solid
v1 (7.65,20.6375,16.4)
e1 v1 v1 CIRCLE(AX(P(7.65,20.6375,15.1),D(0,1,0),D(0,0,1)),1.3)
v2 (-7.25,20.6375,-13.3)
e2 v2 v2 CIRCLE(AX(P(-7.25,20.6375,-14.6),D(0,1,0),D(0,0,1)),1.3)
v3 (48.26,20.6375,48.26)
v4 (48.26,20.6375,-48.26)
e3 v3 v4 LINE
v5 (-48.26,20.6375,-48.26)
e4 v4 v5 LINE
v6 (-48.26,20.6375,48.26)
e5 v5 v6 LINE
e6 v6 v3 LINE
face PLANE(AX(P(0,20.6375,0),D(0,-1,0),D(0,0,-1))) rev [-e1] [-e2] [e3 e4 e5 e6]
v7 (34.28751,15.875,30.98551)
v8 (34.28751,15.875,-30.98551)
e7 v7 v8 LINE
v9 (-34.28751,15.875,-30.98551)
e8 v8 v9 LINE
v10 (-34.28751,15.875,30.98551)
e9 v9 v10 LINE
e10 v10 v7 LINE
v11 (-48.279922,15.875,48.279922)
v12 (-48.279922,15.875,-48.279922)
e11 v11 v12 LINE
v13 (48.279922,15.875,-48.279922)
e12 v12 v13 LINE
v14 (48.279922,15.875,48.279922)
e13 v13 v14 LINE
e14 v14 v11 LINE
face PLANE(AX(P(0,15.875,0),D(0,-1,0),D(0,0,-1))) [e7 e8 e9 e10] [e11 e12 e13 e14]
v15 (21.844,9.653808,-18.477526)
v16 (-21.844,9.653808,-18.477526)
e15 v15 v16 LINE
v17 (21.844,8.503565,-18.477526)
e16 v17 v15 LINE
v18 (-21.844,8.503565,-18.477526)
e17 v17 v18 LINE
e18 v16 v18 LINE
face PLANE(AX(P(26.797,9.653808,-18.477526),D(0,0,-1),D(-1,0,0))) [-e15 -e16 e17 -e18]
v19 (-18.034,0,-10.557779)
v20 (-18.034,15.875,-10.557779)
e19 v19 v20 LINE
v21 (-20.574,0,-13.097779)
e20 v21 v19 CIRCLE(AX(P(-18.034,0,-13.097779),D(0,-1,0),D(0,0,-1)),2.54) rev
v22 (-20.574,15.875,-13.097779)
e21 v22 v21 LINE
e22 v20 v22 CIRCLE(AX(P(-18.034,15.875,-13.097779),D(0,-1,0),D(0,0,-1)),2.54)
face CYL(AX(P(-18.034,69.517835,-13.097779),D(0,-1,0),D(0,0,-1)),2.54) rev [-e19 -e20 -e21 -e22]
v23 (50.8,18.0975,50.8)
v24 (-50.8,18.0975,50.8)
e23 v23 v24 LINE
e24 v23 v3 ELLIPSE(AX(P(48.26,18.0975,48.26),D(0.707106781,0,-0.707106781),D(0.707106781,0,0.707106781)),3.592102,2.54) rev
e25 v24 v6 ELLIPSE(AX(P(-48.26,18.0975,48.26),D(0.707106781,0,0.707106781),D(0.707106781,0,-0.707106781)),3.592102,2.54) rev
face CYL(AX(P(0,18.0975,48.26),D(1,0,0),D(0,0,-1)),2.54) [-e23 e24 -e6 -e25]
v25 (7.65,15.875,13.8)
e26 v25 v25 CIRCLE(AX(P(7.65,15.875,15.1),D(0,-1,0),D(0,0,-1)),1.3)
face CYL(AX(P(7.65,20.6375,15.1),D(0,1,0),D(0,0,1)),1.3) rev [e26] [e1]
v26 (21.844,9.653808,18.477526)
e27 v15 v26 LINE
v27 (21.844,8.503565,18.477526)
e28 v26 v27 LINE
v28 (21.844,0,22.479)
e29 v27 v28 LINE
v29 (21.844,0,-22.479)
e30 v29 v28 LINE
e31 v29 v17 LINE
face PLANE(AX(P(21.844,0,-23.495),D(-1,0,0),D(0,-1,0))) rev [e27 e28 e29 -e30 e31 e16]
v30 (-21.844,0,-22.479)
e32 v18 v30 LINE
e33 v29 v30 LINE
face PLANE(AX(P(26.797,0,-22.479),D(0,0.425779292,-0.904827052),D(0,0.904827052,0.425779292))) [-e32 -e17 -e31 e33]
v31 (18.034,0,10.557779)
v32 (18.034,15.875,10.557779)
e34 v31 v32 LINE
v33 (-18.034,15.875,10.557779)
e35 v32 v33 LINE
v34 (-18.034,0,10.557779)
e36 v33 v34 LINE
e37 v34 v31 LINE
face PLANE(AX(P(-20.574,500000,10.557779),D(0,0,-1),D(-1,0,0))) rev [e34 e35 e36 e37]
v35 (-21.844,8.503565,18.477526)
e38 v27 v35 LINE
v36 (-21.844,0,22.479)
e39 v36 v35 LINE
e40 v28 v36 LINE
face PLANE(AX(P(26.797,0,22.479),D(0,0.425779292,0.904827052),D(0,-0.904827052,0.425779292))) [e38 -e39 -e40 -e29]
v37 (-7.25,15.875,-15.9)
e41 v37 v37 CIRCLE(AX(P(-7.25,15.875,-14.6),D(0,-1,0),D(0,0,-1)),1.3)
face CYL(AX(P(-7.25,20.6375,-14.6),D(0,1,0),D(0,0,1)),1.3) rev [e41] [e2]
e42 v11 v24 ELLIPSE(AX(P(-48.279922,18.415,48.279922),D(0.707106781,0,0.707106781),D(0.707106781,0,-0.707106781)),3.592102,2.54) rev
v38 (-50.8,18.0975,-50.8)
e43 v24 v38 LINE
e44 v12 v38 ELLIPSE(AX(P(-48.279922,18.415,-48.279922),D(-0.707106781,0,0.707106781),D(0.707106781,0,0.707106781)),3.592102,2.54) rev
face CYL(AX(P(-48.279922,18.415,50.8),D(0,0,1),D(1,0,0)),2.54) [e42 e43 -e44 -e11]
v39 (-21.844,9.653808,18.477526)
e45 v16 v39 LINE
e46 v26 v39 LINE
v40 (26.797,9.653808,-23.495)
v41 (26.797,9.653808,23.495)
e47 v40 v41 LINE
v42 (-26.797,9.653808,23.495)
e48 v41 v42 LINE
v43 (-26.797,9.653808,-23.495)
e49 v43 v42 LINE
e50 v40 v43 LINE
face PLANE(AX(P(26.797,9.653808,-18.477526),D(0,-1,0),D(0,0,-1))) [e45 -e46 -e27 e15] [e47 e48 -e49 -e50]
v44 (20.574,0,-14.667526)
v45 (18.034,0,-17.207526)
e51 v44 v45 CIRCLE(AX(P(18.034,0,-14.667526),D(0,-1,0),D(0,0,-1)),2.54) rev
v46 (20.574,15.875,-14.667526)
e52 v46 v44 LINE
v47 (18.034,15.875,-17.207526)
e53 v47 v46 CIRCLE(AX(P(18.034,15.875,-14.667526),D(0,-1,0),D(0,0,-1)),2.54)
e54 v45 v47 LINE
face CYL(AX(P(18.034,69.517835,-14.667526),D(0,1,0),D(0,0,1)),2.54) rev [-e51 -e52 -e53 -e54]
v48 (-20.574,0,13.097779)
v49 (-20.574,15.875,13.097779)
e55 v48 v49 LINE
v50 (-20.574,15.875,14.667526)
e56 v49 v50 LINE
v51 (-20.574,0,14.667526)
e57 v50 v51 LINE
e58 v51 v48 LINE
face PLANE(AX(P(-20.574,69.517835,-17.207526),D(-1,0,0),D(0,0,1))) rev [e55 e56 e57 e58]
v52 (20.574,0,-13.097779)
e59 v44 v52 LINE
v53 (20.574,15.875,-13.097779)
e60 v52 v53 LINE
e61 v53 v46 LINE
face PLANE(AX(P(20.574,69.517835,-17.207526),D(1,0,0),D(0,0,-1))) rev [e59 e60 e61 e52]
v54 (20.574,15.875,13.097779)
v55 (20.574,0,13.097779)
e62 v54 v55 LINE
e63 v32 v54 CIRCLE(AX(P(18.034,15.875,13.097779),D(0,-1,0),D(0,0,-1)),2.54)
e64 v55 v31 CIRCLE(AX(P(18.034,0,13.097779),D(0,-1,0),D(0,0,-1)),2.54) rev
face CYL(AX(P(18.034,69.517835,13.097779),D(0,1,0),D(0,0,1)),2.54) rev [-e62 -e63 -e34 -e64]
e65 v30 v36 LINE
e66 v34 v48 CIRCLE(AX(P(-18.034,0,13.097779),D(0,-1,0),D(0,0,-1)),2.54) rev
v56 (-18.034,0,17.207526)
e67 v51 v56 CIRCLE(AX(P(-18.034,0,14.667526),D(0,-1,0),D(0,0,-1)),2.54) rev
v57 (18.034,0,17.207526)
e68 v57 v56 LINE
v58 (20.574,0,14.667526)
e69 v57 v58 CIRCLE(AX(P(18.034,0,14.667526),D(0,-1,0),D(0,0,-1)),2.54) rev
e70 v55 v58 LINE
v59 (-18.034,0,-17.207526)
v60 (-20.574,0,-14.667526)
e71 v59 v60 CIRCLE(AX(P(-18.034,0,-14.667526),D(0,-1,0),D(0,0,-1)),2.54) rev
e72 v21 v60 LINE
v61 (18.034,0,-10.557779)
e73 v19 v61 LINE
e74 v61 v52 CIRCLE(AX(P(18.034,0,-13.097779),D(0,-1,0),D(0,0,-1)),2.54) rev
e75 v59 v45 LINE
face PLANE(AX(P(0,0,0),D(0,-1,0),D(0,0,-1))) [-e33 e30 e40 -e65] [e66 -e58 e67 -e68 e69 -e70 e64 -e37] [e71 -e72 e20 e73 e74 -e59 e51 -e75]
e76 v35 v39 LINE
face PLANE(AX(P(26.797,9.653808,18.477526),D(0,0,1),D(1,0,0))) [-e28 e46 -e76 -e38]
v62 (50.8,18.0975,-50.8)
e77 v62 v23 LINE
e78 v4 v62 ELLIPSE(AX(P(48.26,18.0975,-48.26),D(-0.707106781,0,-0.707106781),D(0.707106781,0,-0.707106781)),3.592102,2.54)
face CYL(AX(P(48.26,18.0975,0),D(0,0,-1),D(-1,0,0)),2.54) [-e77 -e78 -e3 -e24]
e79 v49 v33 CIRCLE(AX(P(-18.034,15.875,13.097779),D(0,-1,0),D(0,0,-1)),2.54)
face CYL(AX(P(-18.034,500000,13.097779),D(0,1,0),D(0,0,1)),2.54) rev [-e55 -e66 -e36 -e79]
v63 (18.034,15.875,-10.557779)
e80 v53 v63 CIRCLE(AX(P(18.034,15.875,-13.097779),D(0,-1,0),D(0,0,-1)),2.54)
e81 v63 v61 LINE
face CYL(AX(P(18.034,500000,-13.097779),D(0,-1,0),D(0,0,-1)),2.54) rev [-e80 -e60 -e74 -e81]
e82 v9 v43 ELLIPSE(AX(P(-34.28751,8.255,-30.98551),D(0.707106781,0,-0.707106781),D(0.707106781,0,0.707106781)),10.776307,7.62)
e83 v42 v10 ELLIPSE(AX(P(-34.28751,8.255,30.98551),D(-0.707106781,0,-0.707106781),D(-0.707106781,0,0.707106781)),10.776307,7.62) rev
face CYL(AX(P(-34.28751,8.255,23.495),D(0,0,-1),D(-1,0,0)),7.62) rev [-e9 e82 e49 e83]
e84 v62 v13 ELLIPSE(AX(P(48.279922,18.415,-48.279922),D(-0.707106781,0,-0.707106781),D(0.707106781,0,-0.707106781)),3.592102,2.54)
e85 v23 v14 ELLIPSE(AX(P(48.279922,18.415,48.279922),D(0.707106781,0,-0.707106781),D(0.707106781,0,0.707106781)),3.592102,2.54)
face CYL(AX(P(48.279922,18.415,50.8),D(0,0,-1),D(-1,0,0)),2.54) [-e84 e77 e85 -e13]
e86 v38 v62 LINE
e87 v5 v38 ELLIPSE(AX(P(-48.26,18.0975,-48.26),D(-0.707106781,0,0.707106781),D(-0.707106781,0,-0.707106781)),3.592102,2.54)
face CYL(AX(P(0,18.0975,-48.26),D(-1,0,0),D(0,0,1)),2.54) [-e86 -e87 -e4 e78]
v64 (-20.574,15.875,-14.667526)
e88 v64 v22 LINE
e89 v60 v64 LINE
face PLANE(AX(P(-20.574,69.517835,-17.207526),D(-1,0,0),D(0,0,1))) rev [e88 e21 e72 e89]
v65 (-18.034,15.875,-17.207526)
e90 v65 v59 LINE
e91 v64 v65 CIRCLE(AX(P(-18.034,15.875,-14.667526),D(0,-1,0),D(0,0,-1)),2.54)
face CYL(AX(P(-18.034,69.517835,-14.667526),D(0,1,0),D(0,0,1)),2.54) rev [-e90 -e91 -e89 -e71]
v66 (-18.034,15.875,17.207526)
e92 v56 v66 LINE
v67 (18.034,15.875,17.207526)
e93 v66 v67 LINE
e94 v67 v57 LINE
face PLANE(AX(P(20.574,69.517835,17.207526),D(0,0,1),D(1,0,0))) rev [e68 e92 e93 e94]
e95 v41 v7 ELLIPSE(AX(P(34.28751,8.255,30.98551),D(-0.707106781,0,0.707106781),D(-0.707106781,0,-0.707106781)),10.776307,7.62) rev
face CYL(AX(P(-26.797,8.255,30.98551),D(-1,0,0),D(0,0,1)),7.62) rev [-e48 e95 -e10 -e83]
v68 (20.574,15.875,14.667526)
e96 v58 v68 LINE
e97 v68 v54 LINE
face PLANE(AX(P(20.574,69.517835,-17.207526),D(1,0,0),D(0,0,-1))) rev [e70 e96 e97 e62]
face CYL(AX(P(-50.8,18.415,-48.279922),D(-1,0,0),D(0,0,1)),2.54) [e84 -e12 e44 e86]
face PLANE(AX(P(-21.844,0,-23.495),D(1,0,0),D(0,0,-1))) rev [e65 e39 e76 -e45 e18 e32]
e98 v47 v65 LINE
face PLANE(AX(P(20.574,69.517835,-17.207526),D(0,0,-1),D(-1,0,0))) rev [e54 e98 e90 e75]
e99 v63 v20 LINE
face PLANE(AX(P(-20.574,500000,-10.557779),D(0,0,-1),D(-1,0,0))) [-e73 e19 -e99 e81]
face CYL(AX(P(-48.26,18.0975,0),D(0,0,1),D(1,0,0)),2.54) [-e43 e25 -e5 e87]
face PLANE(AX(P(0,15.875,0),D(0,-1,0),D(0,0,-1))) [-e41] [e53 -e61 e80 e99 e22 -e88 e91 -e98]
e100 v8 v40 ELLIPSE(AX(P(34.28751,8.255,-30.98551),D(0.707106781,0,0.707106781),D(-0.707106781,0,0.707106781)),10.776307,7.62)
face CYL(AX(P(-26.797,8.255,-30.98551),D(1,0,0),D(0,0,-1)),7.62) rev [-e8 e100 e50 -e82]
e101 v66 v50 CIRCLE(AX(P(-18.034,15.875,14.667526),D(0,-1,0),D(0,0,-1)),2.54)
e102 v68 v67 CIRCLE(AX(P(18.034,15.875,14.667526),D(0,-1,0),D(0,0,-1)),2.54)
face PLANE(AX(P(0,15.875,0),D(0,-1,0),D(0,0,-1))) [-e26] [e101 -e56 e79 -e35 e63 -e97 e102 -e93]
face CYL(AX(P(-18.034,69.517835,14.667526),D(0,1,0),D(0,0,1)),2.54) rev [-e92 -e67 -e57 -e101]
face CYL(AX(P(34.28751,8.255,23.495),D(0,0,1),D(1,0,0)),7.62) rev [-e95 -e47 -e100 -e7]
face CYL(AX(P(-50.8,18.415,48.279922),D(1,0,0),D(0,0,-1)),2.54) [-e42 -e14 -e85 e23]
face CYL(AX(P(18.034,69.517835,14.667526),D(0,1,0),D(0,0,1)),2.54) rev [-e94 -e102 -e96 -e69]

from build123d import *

# Parameters (mm, degrees)
SKETCH1_W                  = 53.594
SKETCH1_H                  = 46.99
BOSS_EXTRUDE1_DEPTH        = 12.7
CUT_EXTRUDE1_DEPTH         = 62.251008522
SKETCH3_W                  = 4.953
SKETCH3_H                  = 9.653808373
CUT_EXTRUDE2_DEPTH         = 56.564640816
SKETCH4_W                  = 53.594
SKETCH4_H                  = 46.99
BOSS_EXTRUDE2_DEPTH        = 3.175
SKETCH5_W                  = 101.6
SKETCH5_H                  = 101.6
BOSS_EXTRUDE3_DEPTH        = 4.7625
FILLET1_R                  = 7.62
SKETCH6_W                  = 41.148
SKETCH6_H                  = 34.415052436
CUT_EXTRUDE3_DEPTH         = 15.875
F_2_6_2_6_DIAMETER_HOLE1_D = 2.6
FILLET2_R                  = 2.54
FILLET3_R                  = 2.54
FILLET4_R                  = 2.54
BOSS_EXTRUDE4_REACH        = 76.747
SKETCH9_W                  = 41.148
SKETCH9_H                  = 21.115558174
FILLET5_R                  = 2.54


with BuildPart() as part:
    # Sketch1 → Boss-Extrude1 (new body)
    with BuildSketch(Plane(origin=(0, 0, 0), x_dir=(1, 0, 0), z_dir=(0, 1, 0))):
        Rectangle(SKETCH1_W, SKETCH1_H)
    extrude(amount=BOSS_EXTRUDE1_DEPTH)

    # Sketch2 → Cut-Extrude1 (cut, through all)
    with BuildSketch(Plane(origin=(-26.797, 0, -3.302), x_dir=(0, 0, -1), z_dir=(1, 0, 0))):
        Polygon((-25.781, 0), (-21.779526218, 8.503564639), (-21.779526218, 9.653808373), (-26.797, 9.653808373), (-26.797, 0), align=None)
        Polygon((19.177, 0), (20.193, 0), (20.193, 9.653808373), (15.175526218, 9.653808373), (15.175526218, 8.503564639), align=None)
    extrude(amount=CUT_EXTRUDE1_DEPTH, mode=Mode.SUBTRACT)

    # Sketch3 → Cut-Extrude2 (cut, through all)
    with BuildSketch(Plane.XY.offset(23.495)):
        with Locations((-24.3205, 4.826904187)):
            Rectangle(SKETCH3_W, SKETCH3_H)
        with Locations((24.3205, 4.826904187)):
            Rectangle(SKETCH3_W, SKETCH3_H)
    extrude(amount=-CUT_EXTRUDE2_DEPTH, mode=Mode.SUBTRACT)

    # Sketch4 → Boss-Extrude2 (add)
    with BuildSketch(Plane(origin=(0, 12.7, 0), x_dir=(1, 0, 0), z_dir=(0, 1, 0))):
        Rectangle(SKETCH4_W, SKETCH4_H)
    extrude(amount=BOSS_EXTRUDE2_DEPTH)

    # Sketch5 → Boss-Extrude3 (add)
    with BuildSketch(Plane(origin=(0, 15.875, 0), x_dir=(1, 0, 0), z_dir=(0, 1, 0))):
        Rectangle(SKETCH5_W, SKETCH5_H)
    extrude(amount=BOSS_EXTRUDE3_DEPTH)

    # Fillet1
    # the kernel refuses this fillet: 7.62 mm, written as the material it adds along each edge
    with BuildSketch(Plane(origin=(-26.797, 15.875, -23.495), x_dir=(-1, 0, 0), z_dir=(0, 0, 1)), Plane(origin=(26.797, 15.875, 23.495), x_dir=(1, 0, 0), z_dir=(0, 0, -1))) as fillet1_piece_1:
        with BuildLine():
            CenterArc((7.490509671, 7.62), FILLET1_R, 190.577809731, 79.422190269)
            Line((0, 6.221191627), (-0.149810193, 6.19321546))
            ThreePointArc((-0.149810193, 6.19321546), (-0.1524, 3.110595814), (-0.1524, 0))
            Line((-0.1524, 0), (0, -0.1524))
            Line((0, -0.1524), (7.490509671, -0.1524))
            Line((7.490509671, -0.1524), (7.490509671, 0))
        make_face()
    extrude(amount=46.99)
    with BuildSketch(Plane(origin=(26.797, 15.875, -23.495), x_dir=(0, 0, -1), z_dir=(-1, 0, 0)), Plane(origin=(-26.797, 15.875, 23.495), x_dir=(0, 0, 1), z_dir=(1, 0, 0))) as fillet1_piece_2:
        with BuildLine():
            CenterArc((7.490509671, 7.62), FILLET1_R, 190.577809731, 79.422190269)
            Line((0, 6.221191627), (-0.149810193, 6.19321546))
            ThreePointArc((-0.149810193, 6.19321546), (-0.1524, 3.110595814), (-0.1524, 0))
            Line((-0.1524, 0), (0, -0.1524))
            Line((0, -0.1524), (7.490509671, -0.1524))
            Line((7.490509671, -0.1524), (7.490509671, 0))
        make_face()
    extrude(amount=53.594)
    with BuildSketch(Plane(origin=(26.797, 15.875, -23.495), x_dir=(0, 0, -1), z_dir=(-1, 0, 0))) as fillet1_piece_3a_section:
        with BuildLine():
            CenterArc((7.490509671, 7.62), FILLET1_R, 190.577809731, 79.422190269)
            Line((0, 6.221191627), (-0.149810193, 6.19321546))
            ThreePointArc((-0.149810193, 6.19321546), (-0.1524, 3.110595814), (-0.1524, 0))
            Line((-0.1524, 0), (0, -0.1524))
            Line((0, -0.1524), (7.490509671, -0.1524))
            Line((7.490509671, -0.1524), (7.490509671, 0))
        make_face()
    fillet1_piece_3a = extrude(amount=72.320274178, mode=Mode.PRIVATE)
    fillet1_piece_3a = split(fillet1_piece_3a, bisect_by=Plane(origin=(-26.797, 15.875, -23.495), z_dir=(-1, 0, 0)), keep=Keep.TOP, mode=Mode.PRIVATE)
    with BuildSketch(Plane(origin=(-26.797, 15.875, -42.221274178), x_dir=(-1, 0, 0), z_dir=(0, 0, 1))) as fillet1_piece_3b_section:
        with BuildLine():
            CenterArc((7.490509671, 7.62), FILLET1_R, 190.577809731, 79.422190269)
            Line((0, 6.221191627), (-0.149810193, 6.19321546))
            ThreePointArc((-0.149810193, 6.19321546), (-0.1524, 3.110595814), (-0.1524, 0))
            Line((-0.1524, 0), (0, -0.1524))
            Line((0, -0.1524), (7.490509671, -0.1524))
            Line((7.490509671, -0.1524), (7.490509671, 0))
        make_face()
    fillet1_piece_3b = extrude(amount=65.716274178, mode=Mode.PRIVATE)
    fillet1_piece_3b = split(fillet1_piece_3b, bisect_by=Plane(origin=(-26.797, 15.875, -23.495), z_dir=(0, 0, -1)), keep=Keep.TOP, mode=Mode.PRIVATE)
    fillet1_piece_3 = fillet1_piece_3a & fillet1_piece_3b
    add(fillet1_piece_3)
    with BuildSketch(Plane(origin=(-45.523274178, 15.875, 23.495), x_dir=(0, 0, 1), z_dir=(1, 0, 0))) as fillet1_piece_4a_section:
        with BuildLine():
            CenterArc((7.490509671, 7.62), FILLET1_R, 190.577809731, 79.422190269)
            Line((0, 6.221191627), (-0.149810193, 6.19321546))
            ThreePointArc((-0.149810193, 6.19321546), (-0.1524, 3.110595814), (-0.1524, 0))
            Line((-0.1524, 0), (0, -0.1524))
            Line((0, -0.1524), (7.490509671, -0.1524))
            Line((7.490509671, -0.1524), (7.490509671, 0))
        make_face()
    fillet1_piece_4a = extrude(amount=72.320274178, mode=Mode.PRIVATE)
    fillet1_piece_4a = split(fillet1_piece_4a, bisect_by=Plane(origin=(-26.797, 15.875, 23.495), z_dir=(-1, 0, 0)), keep=Keep.TOP, mode=Mode.PRIVATE)
    with BuildSketch(Plane(origin=(-26.797, 15.875, -23.495), x_dir=(-1, 0, 0), z_dir=(0, 0, 1))) as fillet1_piece_4b_section:
        with BuildLine():
            CenterArc((7.490509671, 7.62), FILLET1_R, 190.577809731, 79.422190269)
            Line((0, 6.221191627), (-0.149810193, 6.19321546))
            ThreePointArc((-0.149810193, 6.19321546), (-0.1524, 3.110595814), (-0.1524, 0))
            Line((-0.1524, 0), (0, -0.1524))
            Line((0, -0.1524), (7.490509671, -0.1524))
            Line((7.490509671, -0.1524), (7.490509671, 0))
        make_face()
    fillet1_piece_4b = extrude(amount=65.716274178, mode=Mode.PRIVATE)
    fillet1_piece_4b = split(fillet1_piece_4b, bisect_by=Plane(origin=(-26.797, 15.875, 23.495), z_dir=(0, 0, 1)), keep=Keep.TOP, mode=Mode.PRIVATE)
    fillet1_piece_4 = fillet1_piece_4a & fillet1_piece_4b
    add(fillet1_piece_4)
    with BuildSketch(Plane(origin=(26.797, 15.875, 23.495), x_dir=(1, 0, 0), z_dir=(0, 0, -1))) as fillet1_piece_5a_section:
        with BuildLine():
            CenterArc((7.490509671, 7.62), FILLET1_R, 190.577809731, 79.422190269)
            Line((0, 6.221191627), (-0.149810193, 6.19321546))
            ThreePointArc((-0.149810193, 6.19321546), (-0.1524, 3.110595814), (-0.1524, 0))
            Line((-0.1524, 0), (0, -0.1524))
            Line((0, -0.1524), (7.490509671, -0.1524))
            Line((7.490509671, -0.1524), (7.490509671, 0))
        make_face()
    fillet1_piece_5a = extrude(amount=65.716274178, mode=Mode.PRIVATE)
    fillet1_piece_5a = split(fillet1_piece_5a, bisect_by=Plane(origin=(26.797, 15.875, -23.495), z_dir=(0, 0, -1)), keep=Keep.TOP, mode=Mode.PRIVATE)
    with BuildSketch(Plane(origin=(45.523274178, 15.875, -23.495), x_dir=(0, 0, -1), z_dir=(-1, 0, 0))) as fillet1_piece_5b_section:
        with BuildLine():
            CenterArc((7.490509671, 7.62), FILLET1_R, 190.577809731, 79.422190269)
            Line((0, 6.221191627), (-0.149810193, 6.19321546))
            ThreePointArc((-0.149810193, 6.19321546), (-0.1524, 3.110595814), (-0.1524, 0))
            Line((-0.1524, 0), (0, -0.1524))
            Line((0, -0.1524), (7.490509671, -0.1524))
            Line((7.490509671, -0.1524), (7.490509671, 0))
        make_face()
    fillet1_piece_5b = extrude(amount=72.320274178, mode=Mode.PRIVATE)
    fillet1_piece_5b = split(fillet1_piece_5b, bisect_by=Plane(origin=(26.797, 15.875, -23.495), z_dir=(1, 0, 0)), keep=Keep.TOP, mode=Mode.PRIVATE)
    fillet1_piece_5 = fillet1_piece_5a & fillet1_piece_5b
    add(fillet1_piece_5)
    with BuildSketch(Plane(origin=(-26.797, 15.875, 23.495), x_dir=(0, 0, 1), z_dir=(1, 0, 0))) as fillet1_piece_6a_section:
        with BuildLine():
            CenterArc((7.490509671, 7.62), FILLET1_R, 190.577809731, 79.422190269)
            Line((0, 6.221191627), (-0.149810193, 6.19321546))
            ThreePointArc((-0.149810193, 6.19321546), (-0.1524, 3.110595814), (-0.1524, 0))
            Line((-0.1524, 0), (0, -0.1524))
            Line((0, -0.1524), (7.490509671, -0.1524))
            Line((7.490509671, -0.1524), (7.490509671, 0))
        make_face()
    fillet1_piece_6a = extrude(amount=72.320274178, mode=Mode.PRIVATE)
    fillet1_piece_6a = split(fillet1_piece_6a, bisect_by=Plane(origin=(26.797, 15.875, 23.495), z_dir=(1, 0, 0)), keep=Keep.TOP, mode=Mode.PRIVATE)
    with BuildSketch(Plane(origin=(26.797, 15.875, 42.221274178), x_dir=(1, 0, 0), z_dir=(0, 0, -1))) as fillet1_piece_6b_section:
        with BuildLine():
            CenterArc((7.490509671, 7.62), FILLET1_R, 190.577809731, 79.422190269)
            Line((0, 6.221191627), (-0.149810193, 6.19321546))
            ThreePointArc((-0.149810193, 6.19321546), (-0.1524, 3.110595814), (-0.1524, 0))
            Line((-0.1524, 0), (0, -0.1524))
            Line((0, -0.1524), (7.490509671, -0.1524))
            Line((7.490509671, -0.1524), (7.490509671, 0))
        make_face()
    fillet1_piece_6b = extrude(amount=65.716274178, mode=Mode.PRIVATE)
    fillet1_piece_6b = split(fillet1_piece_6b, bisect_by=Plane(origin=(26.797, 15.875, 23.495), z_dir=(0, 0, 1)), keep=Keep.TOP, mode=Mode.PRIVATE)
    fillet1_piece_6 = fillet1_piece_6a & fillet1_piece_6b
    add(fillet1_piece_6)

    # Sketch6 → Cut-Extrude3 (cut)
    with BuildSketch(Plane.XZ):
        Rectangle(SKETCH6_W, SKETCH6_H)
    extrude(amount=-CUT_EXTRUDE3_DEPTH, mode=Mode.SUBTRACT)

    # Ø2.6 (2.6) Diameter Hole1 (through all)
    with Locations(Plane(origin=(0, 20.6375, 0), x_dir=(1, 0, 0), z_dir=(0, 1, 0))):
        with Locations((-7.25, 14.6), (7.65, -15.1)):
            Hole(F_2_6_2_6_DIAMETER_HOLE1_D / 2)

    # Fillet2
    fillet2_edges = [part.edges().sort_by_distance(p)[0] for p in [
        (50.8, 20.6375, 0),
        (0, 20.6375, -50.8),
        (-50.8, 20.6375, 0),
        (0, 20.6375, 50.8),
    ]]
    fillet(fillet2_edges, radius=FILLET2_R)

    # Fillet3
    # the kernel refuses this fillet: 2.54 mm, written as the material it takes off along each edge
    with BuildSketch(Plane(origin=(57.100195309, 15.875, -50.8), x_dir=(0, 0, 1), z_dir=(-1, 0, 0)), Plane(origin=(50.8, 15.875, 57.100195309), x_dir=(-1, 0, 0), z_dir=(0, 0, -1))) as fillet3_piece_1:
        with BuildLine():
            CenterArc((2.520078124, 2.54), FILLET3_R, 187.180755781, 82.819244219)
            Line((0, 2.2225), (-0.050401562, 2.21615))
            ThreePointArc((-0.050401562, 2.21615), (-0.0508, 1.11125), (-0.0508, 0))
            Line((-0.0508, 0), (0, -0.0508))
            Line((0, -0.0508), (2.520078124, -0.0508))
            Line((2.520078124, -0.0508), (2.520078124, 0))
        make_face()
    extrude(amount=114.200390619, mode=Mode.SUBTRACT)
    with BuildSketch(Plane(origin=(-50.8, 15.875, -57.100195309), x_dir=(0, 1, 0), z_dir=(0, 0, 1)), Plane(origin=(-57.100195309, 15.875, 50.8), x_dir=(0, 1, 0), z_dir=(1, 0, 0))) as fillet3_piece_2:
        with BuildLine():
            CenterArc((2.54, -2.520078124), FILLET3_R, 97.180755781, 82.819244219)
            Line((0, -2.520078124), (-0.0508, -2.520078124))
            Line((-0.0508, -2.520078124), (-0.0508, 0))
            Line((-0.0508, 0), (0, 0.0508))
            ThreePointArc((0, 0.0508), (1.11125, 0.0508), (2.21615, 0.050401562))
            Line((2.21615, 0.050401562), (2.2225, 0))
        make_face()
    extrude(amount=114.200390619, mode=Mode.SUBTRACT)

    # Fillet4
    fillet4_edges = [part.edges().sort_by_distance(p)[0] for p in [
        (20.574, 7.9375, 17.207526218),
        (20.574, 7.9375, -17.207526218),
        (-20.574, 7.9375, -17.207526218),
        (-20.574, 7.9375, 17.207526218),
    ]]
    fillet(fillet4_edges, radius=FILLET4_R)

    # Sketch9 → Boss-Extrude4 (add, up to next)
    with BuildSketch(Plane.XZ, mode=Mode.PRIVATE) as boss_extrude4_sk1:
        Rectangle(SKETCH9_W, SKETCH9_H)
    boss_extrude4_tool1 = extrude(boss_extrude4_sk1.sketch, amount=-BOSS_EXTRUDE4_REACH, mode=Mode.PRIVATE) - part.part
    add(boss_extrude4_tool1.solids().sort_by_distance((0, 0, 0))[0])

    # Fillet5
    fillet5_edges = [part.edges().sort_by_distance(p)[0] for p in [
        (-20.574, 7.9375, 10.557779087),
        (20.574, 7.9375, -10.557779087),
        (-20.574, 7.9375, -10.557779087),
        (20.574, 7.9375, 10.557779087),
    ]]
    fillet(fillet5_edges, radius=FILLET5_R)


solid = part.part
